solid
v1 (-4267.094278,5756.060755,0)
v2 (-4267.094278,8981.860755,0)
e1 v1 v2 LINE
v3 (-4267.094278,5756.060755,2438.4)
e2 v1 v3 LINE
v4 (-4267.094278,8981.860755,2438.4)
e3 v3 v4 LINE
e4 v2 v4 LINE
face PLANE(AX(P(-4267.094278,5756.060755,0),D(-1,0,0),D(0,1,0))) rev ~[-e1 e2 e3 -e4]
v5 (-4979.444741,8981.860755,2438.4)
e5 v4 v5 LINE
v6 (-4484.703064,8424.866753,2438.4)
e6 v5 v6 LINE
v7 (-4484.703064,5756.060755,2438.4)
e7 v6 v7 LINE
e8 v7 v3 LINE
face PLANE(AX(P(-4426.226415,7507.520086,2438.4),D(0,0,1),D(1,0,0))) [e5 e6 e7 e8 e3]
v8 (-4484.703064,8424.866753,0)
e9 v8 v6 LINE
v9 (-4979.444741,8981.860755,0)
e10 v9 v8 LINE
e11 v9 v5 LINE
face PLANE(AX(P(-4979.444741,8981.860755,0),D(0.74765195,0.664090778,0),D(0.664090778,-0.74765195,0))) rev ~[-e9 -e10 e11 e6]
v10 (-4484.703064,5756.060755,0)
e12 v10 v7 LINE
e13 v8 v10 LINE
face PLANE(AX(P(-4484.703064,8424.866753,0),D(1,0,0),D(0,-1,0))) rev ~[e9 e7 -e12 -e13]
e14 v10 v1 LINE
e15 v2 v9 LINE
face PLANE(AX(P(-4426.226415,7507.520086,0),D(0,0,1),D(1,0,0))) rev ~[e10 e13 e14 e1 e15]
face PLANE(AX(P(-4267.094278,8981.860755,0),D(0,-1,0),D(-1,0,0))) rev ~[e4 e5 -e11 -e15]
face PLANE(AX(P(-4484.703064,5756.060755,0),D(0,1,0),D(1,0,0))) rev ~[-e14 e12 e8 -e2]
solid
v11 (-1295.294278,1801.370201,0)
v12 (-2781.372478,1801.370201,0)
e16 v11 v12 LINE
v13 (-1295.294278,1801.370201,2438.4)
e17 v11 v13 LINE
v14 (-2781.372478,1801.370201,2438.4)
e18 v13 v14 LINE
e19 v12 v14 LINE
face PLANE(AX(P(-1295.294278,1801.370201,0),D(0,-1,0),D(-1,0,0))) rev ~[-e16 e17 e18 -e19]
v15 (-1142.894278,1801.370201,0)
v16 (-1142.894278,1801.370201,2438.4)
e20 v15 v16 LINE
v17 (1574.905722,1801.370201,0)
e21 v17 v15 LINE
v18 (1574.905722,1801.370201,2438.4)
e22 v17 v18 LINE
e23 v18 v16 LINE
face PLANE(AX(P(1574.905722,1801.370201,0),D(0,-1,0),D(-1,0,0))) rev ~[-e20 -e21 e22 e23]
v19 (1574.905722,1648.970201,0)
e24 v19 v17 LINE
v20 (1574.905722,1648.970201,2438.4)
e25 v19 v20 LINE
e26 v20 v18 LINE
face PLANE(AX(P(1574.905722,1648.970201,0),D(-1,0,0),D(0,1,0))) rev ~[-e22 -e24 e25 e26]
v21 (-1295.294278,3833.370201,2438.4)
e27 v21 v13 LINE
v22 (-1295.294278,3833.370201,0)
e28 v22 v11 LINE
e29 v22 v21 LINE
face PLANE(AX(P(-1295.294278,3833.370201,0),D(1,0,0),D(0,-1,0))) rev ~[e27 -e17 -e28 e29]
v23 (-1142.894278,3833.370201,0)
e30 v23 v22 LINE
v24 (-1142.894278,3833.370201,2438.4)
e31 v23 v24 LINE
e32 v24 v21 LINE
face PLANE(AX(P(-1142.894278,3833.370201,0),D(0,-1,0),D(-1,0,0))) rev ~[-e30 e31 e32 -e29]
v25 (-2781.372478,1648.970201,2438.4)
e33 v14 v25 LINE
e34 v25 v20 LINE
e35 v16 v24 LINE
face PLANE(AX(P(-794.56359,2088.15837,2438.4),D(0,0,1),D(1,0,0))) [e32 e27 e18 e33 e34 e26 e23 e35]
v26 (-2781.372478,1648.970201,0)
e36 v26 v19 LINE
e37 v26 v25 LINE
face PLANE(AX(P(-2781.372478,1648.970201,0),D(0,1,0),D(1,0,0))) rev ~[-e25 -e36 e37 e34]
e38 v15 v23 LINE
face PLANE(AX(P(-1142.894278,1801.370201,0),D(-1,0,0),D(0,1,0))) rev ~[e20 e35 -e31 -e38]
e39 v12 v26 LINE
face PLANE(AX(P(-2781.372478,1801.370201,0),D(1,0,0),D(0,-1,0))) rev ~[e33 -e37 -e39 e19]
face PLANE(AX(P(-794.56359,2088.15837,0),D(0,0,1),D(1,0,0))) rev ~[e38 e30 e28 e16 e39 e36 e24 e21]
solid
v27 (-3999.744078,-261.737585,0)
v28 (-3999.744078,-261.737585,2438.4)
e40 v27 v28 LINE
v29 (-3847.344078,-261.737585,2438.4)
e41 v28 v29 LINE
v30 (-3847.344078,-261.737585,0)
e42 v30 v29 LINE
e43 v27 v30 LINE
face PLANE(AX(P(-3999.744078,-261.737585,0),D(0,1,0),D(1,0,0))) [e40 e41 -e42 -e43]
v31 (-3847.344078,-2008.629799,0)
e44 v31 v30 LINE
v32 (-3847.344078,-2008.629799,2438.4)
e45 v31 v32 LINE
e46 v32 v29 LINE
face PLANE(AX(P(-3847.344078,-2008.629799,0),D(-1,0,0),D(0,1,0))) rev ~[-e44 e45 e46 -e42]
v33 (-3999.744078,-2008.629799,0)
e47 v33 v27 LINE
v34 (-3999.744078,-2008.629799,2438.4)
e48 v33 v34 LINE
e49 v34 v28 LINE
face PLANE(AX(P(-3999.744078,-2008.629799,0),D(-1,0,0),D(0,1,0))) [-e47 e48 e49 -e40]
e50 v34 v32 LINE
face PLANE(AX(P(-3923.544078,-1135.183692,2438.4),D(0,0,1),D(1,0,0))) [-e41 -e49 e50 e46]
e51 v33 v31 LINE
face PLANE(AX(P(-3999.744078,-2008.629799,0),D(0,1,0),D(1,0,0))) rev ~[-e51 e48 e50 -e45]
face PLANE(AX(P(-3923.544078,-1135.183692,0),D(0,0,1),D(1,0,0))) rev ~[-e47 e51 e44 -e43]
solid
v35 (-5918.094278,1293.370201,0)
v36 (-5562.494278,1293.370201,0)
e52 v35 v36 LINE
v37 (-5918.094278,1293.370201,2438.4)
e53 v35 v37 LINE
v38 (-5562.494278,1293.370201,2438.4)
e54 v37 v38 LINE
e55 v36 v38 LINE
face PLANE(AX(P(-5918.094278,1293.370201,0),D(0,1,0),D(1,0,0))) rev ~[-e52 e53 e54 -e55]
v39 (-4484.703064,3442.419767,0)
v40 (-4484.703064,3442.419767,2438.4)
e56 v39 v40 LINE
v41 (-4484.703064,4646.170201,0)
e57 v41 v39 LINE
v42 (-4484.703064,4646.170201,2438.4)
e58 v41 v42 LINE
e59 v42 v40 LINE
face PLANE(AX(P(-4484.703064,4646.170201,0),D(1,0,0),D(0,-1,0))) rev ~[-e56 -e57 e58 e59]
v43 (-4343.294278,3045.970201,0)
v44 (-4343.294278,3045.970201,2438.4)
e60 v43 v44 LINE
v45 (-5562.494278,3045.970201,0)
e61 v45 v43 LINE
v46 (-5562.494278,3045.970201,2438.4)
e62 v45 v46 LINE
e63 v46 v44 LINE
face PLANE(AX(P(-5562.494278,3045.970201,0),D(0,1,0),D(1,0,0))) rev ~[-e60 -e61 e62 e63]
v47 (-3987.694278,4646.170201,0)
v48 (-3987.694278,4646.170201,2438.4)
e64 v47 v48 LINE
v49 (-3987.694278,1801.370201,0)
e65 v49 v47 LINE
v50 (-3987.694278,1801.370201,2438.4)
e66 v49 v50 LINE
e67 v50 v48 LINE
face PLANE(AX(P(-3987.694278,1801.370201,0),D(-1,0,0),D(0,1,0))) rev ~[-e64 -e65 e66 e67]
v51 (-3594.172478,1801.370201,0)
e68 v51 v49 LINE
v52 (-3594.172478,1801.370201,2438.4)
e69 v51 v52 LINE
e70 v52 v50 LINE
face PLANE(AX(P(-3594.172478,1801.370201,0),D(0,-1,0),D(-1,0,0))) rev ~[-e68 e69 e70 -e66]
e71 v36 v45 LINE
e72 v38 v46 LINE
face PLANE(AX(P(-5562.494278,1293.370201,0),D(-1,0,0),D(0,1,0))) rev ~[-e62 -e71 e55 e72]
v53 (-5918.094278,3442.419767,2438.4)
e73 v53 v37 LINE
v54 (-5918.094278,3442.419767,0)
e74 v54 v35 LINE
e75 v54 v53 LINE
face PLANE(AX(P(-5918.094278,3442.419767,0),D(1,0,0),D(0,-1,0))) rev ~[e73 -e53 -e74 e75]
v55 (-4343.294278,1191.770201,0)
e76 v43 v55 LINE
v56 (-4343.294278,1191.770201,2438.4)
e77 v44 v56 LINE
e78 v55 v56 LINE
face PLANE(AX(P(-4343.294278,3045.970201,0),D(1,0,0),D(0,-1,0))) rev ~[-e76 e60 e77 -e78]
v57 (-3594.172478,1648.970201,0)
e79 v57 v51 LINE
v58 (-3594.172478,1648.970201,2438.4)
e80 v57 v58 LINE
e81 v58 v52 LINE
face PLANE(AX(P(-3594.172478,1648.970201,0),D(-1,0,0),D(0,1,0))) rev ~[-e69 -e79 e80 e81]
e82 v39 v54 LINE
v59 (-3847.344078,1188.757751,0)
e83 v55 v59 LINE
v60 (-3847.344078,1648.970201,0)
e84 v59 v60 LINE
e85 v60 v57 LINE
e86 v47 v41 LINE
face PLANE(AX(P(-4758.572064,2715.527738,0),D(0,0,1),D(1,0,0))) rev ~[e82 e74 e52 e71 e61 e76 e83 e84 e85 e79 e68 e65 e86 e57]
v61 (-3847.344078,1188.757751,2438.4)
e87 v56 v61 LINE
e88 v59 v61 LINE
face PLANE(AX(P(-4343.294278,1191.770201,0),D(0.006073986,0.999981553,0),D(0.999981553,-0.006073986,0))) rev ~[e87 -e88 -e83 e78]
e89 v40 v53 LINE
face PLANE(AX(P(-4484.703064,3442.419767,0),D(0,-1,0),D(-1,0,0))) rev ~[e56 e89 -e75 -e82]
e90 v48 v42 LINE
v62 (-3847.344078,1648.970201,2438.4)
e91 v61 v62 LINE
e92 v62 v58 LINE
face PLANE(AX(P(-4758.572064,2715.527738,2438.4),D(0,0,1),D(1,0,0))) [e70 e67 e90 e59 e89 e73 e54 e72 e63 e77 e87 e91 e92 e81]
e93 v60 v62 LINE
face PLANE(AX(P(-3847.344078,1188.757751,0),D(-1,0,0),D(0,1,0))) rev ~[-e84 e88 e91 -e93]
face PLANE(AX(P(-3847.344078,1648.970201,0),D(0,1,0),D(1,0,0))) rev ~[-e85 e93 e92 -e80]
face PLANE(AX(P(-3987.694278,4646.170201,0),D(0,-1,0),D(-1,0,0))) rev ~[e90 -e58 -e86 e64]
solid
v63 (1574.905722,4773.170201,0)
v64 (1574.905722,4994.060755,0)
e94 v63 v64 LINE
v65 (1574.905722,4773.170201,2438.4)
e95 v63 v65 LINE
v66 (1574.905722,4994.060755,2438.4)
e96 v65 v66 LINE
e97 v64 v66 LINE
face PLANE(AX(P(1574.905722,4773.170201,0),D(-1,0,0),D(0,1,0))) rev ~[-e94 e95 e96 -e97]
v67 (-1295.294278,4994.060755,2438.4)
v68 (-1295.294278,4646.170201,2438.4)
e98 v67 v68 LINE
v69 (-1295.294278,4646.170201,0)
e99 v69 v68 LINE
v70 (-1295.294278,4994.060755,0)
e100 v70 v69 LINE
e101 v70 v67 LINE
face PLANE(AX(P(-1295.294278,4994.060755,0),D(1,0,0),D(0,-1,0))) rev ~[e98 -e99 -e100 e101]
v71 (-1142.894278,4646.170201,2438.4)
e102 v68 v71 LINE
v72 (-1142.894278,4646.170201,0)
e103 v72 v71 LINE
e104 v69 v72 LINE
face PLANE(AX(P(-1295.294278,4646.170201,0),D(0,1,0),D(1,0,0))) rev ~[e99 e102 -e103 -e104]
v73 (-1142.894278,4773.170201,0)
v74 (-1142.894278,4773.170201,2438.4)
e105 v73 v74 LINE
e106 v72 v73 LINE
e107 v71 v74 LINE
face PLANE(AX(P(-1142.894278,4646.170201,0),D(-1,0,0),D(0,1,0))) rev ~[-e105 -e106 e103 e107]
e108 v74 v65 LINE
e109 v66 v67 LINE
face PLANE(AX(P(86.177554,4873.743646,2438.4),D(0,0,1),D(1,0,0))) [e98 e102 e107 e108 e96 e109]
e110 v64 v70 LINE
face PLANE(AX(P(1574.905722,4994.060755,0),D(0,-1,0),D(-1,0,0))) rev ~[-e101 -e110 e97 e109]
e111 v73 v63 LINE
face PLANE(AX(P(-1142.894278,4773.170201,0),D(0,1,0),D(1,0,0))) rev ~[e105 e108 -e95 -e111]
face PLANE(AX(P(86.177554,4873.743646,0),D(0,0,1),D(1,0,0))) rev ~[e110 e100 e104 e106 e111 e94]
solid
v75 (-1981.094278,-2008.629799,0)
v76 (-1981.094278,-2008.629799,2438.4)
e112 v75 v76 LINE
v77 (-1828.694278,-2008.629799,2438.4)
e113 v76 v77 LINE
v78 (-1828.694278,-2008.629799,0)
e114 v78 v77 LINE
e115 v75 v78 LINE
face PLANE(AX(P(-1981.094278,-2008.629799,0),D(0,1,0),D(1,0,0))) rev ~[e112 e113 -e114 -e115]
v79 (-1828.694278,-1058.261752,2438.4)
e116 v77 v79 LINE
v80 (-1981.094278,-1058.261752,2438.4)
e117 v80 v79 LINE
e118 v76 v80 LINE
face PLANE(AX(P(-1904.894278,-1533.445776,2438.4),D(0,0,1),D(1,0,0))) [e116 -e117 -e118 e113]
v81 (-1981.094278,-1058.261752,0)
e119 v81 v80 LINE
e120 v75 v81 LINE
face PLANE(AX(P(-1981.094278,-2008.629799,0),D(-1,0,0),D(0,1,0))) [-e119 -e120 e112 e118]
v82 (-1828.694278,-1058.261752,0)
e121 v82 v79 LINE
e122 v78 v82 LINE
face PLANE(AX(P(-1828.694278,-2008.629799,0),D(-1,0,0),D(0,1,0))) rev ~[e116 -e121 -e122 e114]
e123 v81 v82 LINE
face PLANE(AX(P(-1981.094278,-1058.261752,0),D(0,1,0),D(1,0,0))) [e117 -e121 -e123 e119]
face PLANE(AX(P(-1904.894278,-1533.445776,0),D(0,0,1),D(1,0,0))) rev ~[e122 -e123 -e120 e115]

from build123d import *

# Parameters (mm, degrees)
F2_DEPTH = 2438.4
F0_W     = 152.4
F0_H     = 1746.8922138214
F0_H_2   = 950.3680467606


# Not quite as in the source:
# - the program builds the solid bodies; features that only make, move or delete a surface that nothing else refers to are left out


with BuildPart() as f2:
    # F0 (on Top) → F2 (new body)
    with BuildSketch(Plane.XY):
        Polygon((-3847.3440776825, 1188.7577511787), (-3847.3440776825, 1648.9702011108), (-3594.1724777222, 1648.9702011108), (-3594.1724777222, 1801.3702011108), (-3987.6942779541, 1801.3702011108), (-3987.6942779541, 4646.1702011108), (-4484.7030639648, 4646.1702011108), (-4484.7030639648, 3442.4197673798), (-5918.0942779541, 3442.4197673798), (-5918.0942779541, 3045.9702011108), (-5918.0942779541, 1293.3702011108), (-5562.4942779541, 1293.3702011108), (-5562.4942779541, 3045.9702011108), (-4343.2942779541, 3045.9702011108), (-4343.2942779541, 1191.7702011108), align=None)
    extrude(amount=F2_DEPTH)


with BuildPart() as f2b:
    # F0 (on Top) → F2, piece 2 (new body)
    with BuildSketch(Plane.XY):
        Polygon((-4267.0942779541, 5756.060754776), (-4267.0942779541, 8981.860754776), (-4979.4447412196, 8981.860754776), (-4484.7030639648, 8424.8667533997), (-4484.7030639648, 5930.2643890381), (-4484.7030639648, 5756.060754776), align=None)
    extrude(amount=F2_DEPTH)


with BuildPart() as f2c:
    # F0 (on Top) → F2, piece 3 (new body)
    with BuildSketch(Plane.XY):
        Polygon((-1142.8942779541, 4773.1702011108), (1574.9057220459, 4773.1702011108), (1574.9057220459, 4994.060754776), (-1295.2942779541, 4994.060754776), (-1295.2942779541, 4646.1702011108), (-1142.8942779541, 4646.1702011108), align=None)
    extrude(amount=F2_DEPTH)


with BuildPart() as f2d:
    # F0 (on Top) → F2, piece 4 (new body)
    with BuildSketch(Plane.XY):
        Polygon((-2781.3724777222, 1648.9702011108), (1574.9057220459, 1648.9702011108), (1574.9057220459, 1801.3702011108), (-1142.8942779541, 1801.3702011108), (-1142.8942779541, 3833.3702011108), (-1295.2942779541, 3833.3702011108), (-1295.2942779541, 1801.3702011108), (-2781.3724777222, 1801.3702011108), align=None)
    extrude(amount=F2_DEPTH)


with BuildPart() as f2e:
    # F0 (on Top) → F2, piece 5 (new body)
    with BuildSketch(Plane.XY):
        with Locations((-3923.5440776825, -1135.1836919785)):
            Rectangle(F0_W, F0_H)
    extrude(amount=F2_DEPTH)


with BuildPart() as f2f:
    # F0 (on Top) → F2, piece 6 (new body)
    with BuildSketch(Plane.XY):
        with Locations((-1904.8942779541, -1533.4457755089)):
            Rectangle(F0_W, F0_H_2)
    extrude(amount=F2_DEPTH)


solid = Compound([f2.part, f2b.part, f2c.part, f2d.part, f2e.part, f2f.part])
